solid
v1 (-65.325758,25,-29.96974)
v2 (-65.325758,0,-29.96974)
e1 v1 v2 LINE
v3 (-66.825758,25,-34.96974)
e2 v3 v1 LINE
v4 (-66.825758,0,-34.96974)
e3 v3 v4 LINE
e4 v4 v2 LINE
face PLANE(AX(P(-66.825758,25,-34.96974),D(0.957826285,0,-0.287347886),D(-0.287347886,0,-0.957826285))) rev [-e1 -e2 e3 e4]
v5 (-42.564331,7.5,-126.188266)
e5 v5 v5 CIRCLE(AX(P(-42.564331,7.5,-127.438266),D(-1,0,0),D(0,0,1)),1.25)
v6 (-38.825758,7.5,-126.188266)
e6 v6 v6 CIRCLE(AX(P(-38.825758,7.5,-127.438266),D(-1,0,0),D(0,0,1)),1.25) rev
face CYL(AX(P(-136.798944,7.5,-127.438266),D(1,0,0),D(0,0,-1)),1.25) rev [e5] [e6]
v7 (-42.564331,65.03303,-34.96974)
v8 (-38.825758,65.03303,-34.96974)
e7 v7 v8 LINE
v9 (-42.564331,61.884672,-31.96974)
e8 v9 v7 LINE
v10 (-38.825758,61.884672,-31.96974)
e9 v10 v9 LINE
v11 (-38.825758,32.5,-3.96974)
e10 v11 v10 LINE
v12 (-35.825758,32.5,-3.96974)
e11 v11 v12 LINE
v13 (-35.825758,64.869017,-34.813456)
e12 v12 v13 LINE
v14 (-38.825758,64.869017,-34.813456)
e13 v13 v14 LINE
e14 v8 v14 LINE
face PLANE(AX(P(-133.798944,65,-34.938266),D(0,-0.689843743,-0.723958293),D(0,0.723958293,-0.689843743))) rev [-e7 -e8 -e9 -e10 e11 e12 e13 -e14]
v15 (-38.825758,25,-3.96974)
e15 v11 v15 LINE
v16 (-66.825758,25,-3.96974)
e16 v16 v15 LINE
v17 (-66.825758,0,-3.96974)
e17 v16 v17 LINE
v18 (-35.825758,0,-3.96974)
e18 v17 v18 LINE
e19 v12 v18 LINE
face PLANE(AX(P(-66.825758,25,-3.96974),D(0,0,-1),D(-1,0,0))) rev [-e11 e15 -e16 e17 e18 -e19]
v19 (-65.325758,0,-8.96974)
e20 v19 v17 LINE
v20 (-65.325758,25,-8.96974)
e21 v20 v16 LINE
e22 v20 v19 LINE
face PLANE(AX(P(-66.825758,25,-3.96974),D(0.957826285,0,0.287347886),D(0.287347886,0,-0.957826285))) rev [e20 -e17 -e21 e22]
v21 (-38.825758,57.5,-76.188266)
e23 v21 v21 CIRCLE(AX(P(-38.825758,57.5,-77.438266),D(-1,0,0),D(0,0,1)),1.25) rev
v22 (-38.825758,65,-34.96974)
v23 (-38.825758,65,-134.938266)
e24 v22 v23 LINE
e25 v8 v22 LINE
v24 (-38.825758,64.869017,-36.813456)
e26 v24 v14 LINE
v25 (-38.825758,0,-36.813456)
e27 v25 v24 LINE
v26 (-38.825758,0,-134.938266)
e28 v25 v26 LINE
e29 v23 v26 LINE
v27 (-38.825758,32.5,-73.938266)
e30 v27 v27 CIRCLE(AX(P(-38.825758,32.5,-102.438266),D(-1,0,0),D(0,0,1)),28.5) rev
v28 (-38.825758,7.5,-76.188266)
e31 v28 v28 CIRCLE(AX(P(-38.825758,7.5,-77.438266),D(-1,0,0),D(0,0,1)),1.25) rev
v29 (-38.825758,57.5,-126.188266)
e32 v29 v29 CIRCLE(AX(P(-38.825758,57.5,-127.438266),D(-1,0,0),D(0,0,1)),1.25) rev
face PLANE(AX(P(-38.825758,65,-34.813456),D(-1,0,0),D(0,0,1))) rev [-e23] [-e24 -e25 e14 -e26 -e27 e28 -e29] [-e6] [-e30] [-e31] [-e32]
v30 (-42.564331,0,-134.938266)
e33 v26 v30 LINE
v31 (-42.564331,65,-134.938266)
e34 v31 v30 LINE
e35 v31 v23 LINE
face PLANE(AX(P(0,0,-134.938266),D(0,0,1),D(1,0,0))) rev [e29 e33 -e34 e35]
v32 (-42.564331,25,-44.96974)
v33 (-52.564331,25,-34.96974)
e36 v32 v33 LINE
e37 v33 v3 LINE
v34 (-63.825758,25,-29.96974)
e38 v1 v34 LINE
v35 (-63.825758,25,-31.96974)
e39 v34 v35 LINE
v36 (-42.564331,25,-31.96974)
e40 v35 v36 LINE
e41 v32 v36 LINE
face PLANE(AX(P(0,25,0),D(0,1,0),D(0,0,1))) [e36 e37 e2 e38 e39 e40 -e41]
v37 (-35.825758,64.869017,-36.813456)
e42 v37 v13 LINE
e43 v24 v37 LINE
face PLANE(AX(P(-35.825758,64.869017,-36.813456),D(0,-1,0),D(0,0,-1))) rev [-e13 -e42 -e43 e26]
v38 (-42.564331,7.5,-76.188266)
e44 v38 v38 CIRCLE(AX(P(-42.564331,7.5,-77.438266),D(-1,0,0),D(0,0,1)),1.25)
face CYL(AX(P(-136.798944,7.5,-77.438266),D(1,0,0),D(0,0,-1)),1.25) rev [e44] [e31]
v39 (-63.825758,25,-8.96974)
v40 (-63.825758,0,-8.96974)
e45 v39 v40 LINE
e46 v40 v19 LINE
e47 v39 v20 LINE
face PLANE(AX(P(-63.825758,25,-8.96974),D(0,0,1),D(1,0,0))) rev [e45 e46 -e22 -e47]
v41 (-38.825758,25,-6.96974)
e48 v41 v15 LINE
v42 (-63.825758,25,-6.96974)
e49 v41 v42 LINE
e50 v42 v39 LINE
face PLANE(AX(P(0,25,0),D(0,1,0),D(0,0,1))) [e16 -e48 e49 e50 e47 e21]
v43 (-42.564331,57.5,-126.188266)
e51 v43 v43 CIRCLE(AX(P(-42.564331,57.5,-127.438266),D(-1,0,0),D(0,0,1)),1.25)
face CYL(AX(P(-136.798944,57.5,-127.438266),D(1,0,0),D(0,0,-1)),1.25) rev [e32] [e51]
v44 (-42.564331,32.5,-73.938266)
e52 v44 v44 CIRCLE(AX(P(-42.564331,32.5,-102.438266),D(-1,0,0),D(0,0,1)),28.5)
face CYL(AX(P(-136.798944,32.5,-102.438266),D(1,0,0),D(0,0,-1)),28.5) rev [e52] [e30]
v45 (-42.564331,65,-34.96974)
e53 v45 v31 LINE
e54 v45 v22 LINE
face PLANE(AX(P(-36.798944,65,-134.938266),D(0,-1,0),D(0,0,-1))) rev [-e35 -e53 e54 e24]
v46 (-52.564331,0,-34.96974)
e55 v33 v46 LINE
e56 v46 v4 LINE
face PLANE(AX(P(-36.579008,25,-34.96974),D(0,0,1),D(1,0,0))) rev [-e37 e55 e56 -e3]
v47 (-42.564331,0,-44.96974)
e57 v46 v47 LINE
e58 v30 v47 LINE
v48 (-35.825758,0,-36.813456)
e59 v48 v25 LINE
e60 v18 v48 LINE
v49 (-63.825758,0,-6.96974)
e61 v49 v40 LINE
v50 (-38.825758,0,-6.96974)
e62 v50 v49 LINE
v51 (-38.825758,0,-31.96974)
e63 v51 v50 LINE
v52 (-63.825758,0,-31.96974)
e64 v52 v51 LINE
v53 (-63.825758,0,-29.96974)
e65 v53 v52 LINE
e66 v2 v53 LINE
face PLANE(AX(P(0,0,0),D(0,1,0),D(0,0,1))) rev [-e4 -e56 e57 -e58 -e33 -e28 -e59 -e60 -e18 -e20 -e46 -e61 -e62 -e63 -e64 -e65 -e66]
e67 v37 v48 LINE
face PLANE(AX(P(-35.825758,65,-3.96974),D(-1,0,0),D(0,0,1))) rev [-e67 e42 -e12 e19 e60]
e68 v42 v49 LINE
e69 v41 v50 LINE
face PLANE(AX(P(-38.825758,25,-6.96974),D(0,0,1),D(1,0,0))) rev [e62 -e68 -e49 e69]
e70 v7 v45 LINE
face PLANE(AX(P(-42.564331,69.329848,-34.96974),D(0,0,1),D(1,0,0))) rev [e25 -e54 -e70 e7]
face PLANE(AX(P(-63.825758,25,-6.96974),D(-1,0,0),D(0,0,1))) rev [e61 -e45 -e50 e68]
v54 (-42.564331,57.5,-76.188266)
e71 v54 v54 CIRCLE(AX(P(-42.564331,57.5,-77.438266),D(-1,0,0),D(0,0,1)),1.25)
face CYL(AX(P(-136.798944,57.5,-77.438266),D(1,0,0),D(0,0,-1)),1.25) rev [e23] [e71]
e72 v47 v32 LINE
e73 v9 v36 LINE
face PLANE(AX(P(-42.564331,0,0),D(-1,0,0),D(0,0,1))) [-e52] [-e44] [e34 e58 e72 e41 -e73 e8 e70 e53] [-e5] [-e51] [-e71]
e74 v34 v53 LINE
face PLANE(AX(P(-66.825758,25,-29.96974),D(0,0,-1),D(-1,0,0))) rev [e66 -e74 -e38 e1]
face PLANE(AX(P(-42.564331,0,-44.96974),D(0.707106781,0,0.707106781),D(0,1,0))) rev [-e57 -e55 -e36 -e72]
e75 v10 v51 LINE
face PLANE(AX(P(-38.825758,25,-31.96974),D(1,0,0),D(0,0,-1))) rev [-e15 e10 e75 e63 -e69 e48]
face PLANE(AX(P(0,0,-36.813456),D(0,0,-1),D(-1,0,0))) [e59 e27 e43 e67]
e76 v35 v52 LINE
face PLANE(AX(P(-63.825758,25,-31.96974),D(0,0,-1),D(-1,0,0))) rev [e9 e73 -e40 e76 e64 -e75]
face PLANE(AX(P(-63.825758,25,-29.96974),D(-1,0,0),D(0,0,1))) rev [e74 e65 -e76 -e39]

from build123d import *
from build123d.topology import SkipClean

# Parameters (mm, degrees)
EXTRUDE_1_DEPTH      = 25
CUT_EXTRUDE_4_DEPTH  = 80.457942189
SKETCH_7_W           = 16.60831278
SKETCH_7_H           = 38.473598513
CUT_EXTRUDE_14_DEPTH = 80.457942189
SKETCH_8_W           = 5
SKETCH_8_H           = 30.968526609
EXTRUDE_2_DEPTH      = 25
SKETCH_9_W           = 2.765387297
SKETCH_9_H           = 65
EXTRUDE_3_DEPTH      = 100
SKETCH_10_W          = 5.026813651
SKETCH_10_H          = 30.968526609
EXTRUDE_4_DEPTH      = 40
CUT_EXTRUDE_15_DEPTH = 100
SKETCH_12_R          = 28.5
CUT_EXTRUDE_16_DEPTH = 100
SKETCH_13_R          = 1.25
CUT_EXTRUDE_17_DEPTH = 100
SKETCH_14_W          = 5.026813651
SKETCH_14_H          = 100.124810737
CUT_EXTRUDE_19_DEPTH = 165.009199789
SKETCH_15_W          = 2.026813651
SKETCH_15_H          = 30.843715872
CUT_EXTRUDE_20_DEPTH = 165.009199789
SKETCH_16_W          = 99.968526609
SKETCH_16_H          = 65
SKETCH_16_R          = 28.5
SKETCH_16_R_2        = 1.25
EXTRUDE_5_DEPTH      = 3
EXTRUDE_7_REACH      = 157.801
SKETCH_17_W          = 3.738573646
SKETCH_17_H          = 3
CHAMFER_1_DEPTH      = 25
SKETCH_18_W          = 3
SKETCH_18_H          = 64.869017051
EXTRUDE_8_DEPTH      = 2


with BuildPart() as part:
    # Эскиз1 → Бобышка-Вытянуть1 (new body)
    with BuildSketch(Plane(origin=(0, 0, 0), x_dir=(1, 0, 0), z_dir=(0, 1, 0))):
        Polygon((-66.825757576, 34.969739794), (-66.825757576, 29.969739794), (-63.825757576, 29.969739794), (-63.825757576, 31.969739794), (-38.825757576, 31.969739794), (-38.825757576, 6.969739794), (-63.825757576, 6.969739794), (-63.825757576, 8.969739794), (-66.825757576, 8.969739794), (-66.825757576, 3.969739794), (-22.123470102, 3.969739794), (-36.579007505, 34.969739794), align=None)
    extrude(amount=EXTRUDE_1_DEPTH)

    # Эскиз3 → Вырез-Вытянуть4 (cut, through all)
    with BuildSketch(Plane.XZ):
        Polygon((-66.825757576, -3.969739794), (-65.325757576, -8.969739794), (-66.825757576, -8.969739794), align=None)
        Polygon((-66.825757576, -29.969739794), (-66.825757576, -34.969739794), (-65.325757576, -29.969739794), align=None)
    extrude(amount=-CUT_EXTRUDE_4_DEPTH, mode=Mode.SUBTRACT)

    # Эскиз7 → Вырез-Вытянуть14 (cut, through all)
    with BuildSketch(Plane(origin=(0, 0, 0), x_dir=(-1, 0, 0), z_dir=(0, -1, 0))):
        with Locations((27.703474463, 20.539743139)):
            Rectangle(SKETCH_7_W, SKETCH_7_H)
    extrude(amount=-CUT_EXTRUDE_14_DEPTH, mode=Mode.SUBTRACT)

    # Эскиз8 → Бобышка-Вытянуть2 (add)
    with BuildSketch(Plane(origin=(0, 0, 0), x_dir=(-1, 0, 0), z_dir=(0, -1, 0))):
        with Locations((36.298943925, 19.454003098)):
            Rectangle(SKETCH_8_W, SKETCH_8_H)
    extrude(amount=-EXTRUDE_2_DEPTH)

    # Эскиз9 → Бобышка-Вытянуть3 (add)
    with BuildSketch(Plane(origin=(0, 0, -34.938266403), x_dir=(-1, 0, 0), z_dir=(0, 0, -1))):
        with Locations((38.181637573, 32.5)):
            Rectangle(SKETCH_9_W, SKETCH_9_H)
    extrude(amount=EXTRUDE_3_DEPTH)

    # Эскиз10 → Бобышка-Вытянуть4 (add)
    with BuildSketch(Plane(origin=(0, 25, 0), x_dir=(1, 0, 0), z_dir=(0, 1, 0))):
        with Locations((-36.312350751, 19.454003098)):
            Rectangle(SKETCH_10_W, SKETCH_10_H)
    extrude(amount=EXTRUDE_4_DEPTH)

    # Эскиз11 → Вырез-Вытянуть15 (cut)
    with BuildSketch(Plane(origin=(-33.798943925, 0, 0), x_dir=(0, 0, -1), z_dir=(1, 0, 0))):
        Polygon((34.938266403, 65), (3.969739794, 32.5), (3.969739794, 65), align=None)
    extrude(amount=-CUT_EXTRUDE_15_DEPTH, mode=Mode.SUBTRACT)

    # Эскиз12 → Вырез-Вытянуть16 (cut)
    with BuildSketch(Plane(origin=(-36.798943925, 0, 0), x_dir=(0, 0, -1), z_dir=(1, 0, 0))):
        with Locations((102.438266403, 32.5)):
            Circle(SKETCH_12_R)
    extrude(amount=-CUT_EXTRUDE_16_DEPTH, mode=Mode.SUBTRACT)

    # Эскиз13 → Вырез-Вытянуть17 (cut)
    with BuildSketch(Plane(origin=(-36.798943925, 0, 0), x_dir=(0, 0, -1), z_dir=(1, 0, 0))):
        with Locations((77.438266403, 57.5)):
            Circle(SKETCH_13_R)
        with Locations((127.438266403, 57.5)):
            Circle(SKETCH_13_R)
        with Locations((127.438266403, 7.5)):
            Circle(SKETCH_13_R)
        with Locations((77.438266403, 7.5)):
            Circle(SKETCH_13_R)
    extrude(amount=-CUT_EXTRUDE_17_DEPTH, mode=Mode.SUBTRACT)

    # Эскиз14 → Вырез-Вытянуть19 (cut, through all)
    with BuildSketch(Plane(origin=(0, 0, 0), x_dir=(-1, 0, 0), z_dir=(0, -1, 0))):
        with Locations((36.312350751, 84.875861035)):
            Rectangle(SKETCH_14_W, SKETCH_14_H)
    extrude(amount=-CUT_EXTRUDE_19_DEPTH, mode=Mode.SUBTRACT)

    # Эскиз15 → Вырез-Вытянуть20 (cut, through all)
    with BuildSketch(Plane.XZ):
        with Locations((-34.812350751, -19.39159773)):
            Rectangle(SKETCH_15_W, SKETCH_15_H)
    extrude(amount=-CUT_EXTRUDE_20_DEPTH, mode=Mode.SUBTRACT)

    # Эскиз16 → Бобышка-Вытянуть5 (add)
    with SkipClean():  # the faces are left unmerged after this step: merging them gives an invalid solid
        with BuildSketch(Plane.ZY.offset(39.564331222)):
            with Locations((-84.954003098, 32.5)):
                Rectangle(SKETCH_16_W, SKETCH_16_H)
            with Locations((-102.438266403, 32.5)):
                Circle(SKETCH_16_R, mode=Mode.SUBTRACT)
            with Locations((-127.438266403, 57.5)):
                Circle(SKETCH_16_R_2, mode=Mode.SUBTRACT)
            with Locations((-77.438266403, 57.5)):
                Circle(SKETCH_16_R_2, mode=Mode.SUBTRACT)
            with Locations((-77.438266403, 7.5)):
                Circle(SKETCH_16_R_2, mode=Mode.SUBTRACT)
            with Locations((-127.438266403, 7.5)):
                Circle(SKETCH_16_R_2, mode=Mode.SUBTRACT)
        extrude(amount=EXTRUDE_5_DEPTH)

    # Бобышка-Вытянуть7: up to this plane
    with SkipClean():  # the faces are left unmerged after this step: merging them gives an invalid solid
        extrude_7_end = Plane(origin=(-133.798943925, 65, -34.938266403), z_dir=(0, -0.6898437432956686, -0.7239582928842101))
        # Эскиз17 → Бобышка-Вытянуть7 (add, up to the surface)
        with BuildSketch(Plane(origin=(0, 25, 0), x_dir=(1, 0, 0), z_dir=(0, 1, 0)), mode=Mode.PRIVATE) as extrude_7_sk1:
            with Locations((-40.695044399, 33.469739794)):
                Rectangle(SKETCH_17_W, SKETCH_17_H)
        extrude_7_tool1 = split(extrude(extrude_7_sk1.sketch, amount=EXTRUDE_7_REACH, mode=Mode.PRIVATE), bisect_by=extrude_7_end, keep=Keep.BOTH, mode=Mode.PRIVATE)
        add(extrude_7_tool1.solids().sort_by_distance((-40.695044, 25, -33.46974))[0])

    # Фаска1: read off the stored shape, not the designer's step
    # Фаска1 outline → Фаска1 (add)
    with SkipClean():  # the faces are left unmerged after this step: merging them gives an invalid solid
        with BuildSketch(Plane(origin=(0, 0, 0), x_dir=(1, 0, 0), z_dir=(0, 1, 0))):
            Polygon((-42.564331222, 44.969739794), (-52.564331222, 34.969739794), (-42.564331222, 34.969739794), align=None)
        extrude(amount=CHAMFER_1_DEPTH)

    # Эскиз18 → Бобышка-Вытянуть8 (add)
    with SkipClean():  # the faces are left unmerged after this step: merging them gives an invalid solid
        with BuildSketch(Plane(origin=(0, 0, -34.813455666), x_dir=(-1, 0, 0), z_dir=(0, 0, -1))):
            with Locations((37.325757576, 32.434508526)):
                Rectangle(SKETCH_18_W, SKETCH_18_H)
        extrude(amount=EXTRUDE_8_DEPTH)


solid = part.part
